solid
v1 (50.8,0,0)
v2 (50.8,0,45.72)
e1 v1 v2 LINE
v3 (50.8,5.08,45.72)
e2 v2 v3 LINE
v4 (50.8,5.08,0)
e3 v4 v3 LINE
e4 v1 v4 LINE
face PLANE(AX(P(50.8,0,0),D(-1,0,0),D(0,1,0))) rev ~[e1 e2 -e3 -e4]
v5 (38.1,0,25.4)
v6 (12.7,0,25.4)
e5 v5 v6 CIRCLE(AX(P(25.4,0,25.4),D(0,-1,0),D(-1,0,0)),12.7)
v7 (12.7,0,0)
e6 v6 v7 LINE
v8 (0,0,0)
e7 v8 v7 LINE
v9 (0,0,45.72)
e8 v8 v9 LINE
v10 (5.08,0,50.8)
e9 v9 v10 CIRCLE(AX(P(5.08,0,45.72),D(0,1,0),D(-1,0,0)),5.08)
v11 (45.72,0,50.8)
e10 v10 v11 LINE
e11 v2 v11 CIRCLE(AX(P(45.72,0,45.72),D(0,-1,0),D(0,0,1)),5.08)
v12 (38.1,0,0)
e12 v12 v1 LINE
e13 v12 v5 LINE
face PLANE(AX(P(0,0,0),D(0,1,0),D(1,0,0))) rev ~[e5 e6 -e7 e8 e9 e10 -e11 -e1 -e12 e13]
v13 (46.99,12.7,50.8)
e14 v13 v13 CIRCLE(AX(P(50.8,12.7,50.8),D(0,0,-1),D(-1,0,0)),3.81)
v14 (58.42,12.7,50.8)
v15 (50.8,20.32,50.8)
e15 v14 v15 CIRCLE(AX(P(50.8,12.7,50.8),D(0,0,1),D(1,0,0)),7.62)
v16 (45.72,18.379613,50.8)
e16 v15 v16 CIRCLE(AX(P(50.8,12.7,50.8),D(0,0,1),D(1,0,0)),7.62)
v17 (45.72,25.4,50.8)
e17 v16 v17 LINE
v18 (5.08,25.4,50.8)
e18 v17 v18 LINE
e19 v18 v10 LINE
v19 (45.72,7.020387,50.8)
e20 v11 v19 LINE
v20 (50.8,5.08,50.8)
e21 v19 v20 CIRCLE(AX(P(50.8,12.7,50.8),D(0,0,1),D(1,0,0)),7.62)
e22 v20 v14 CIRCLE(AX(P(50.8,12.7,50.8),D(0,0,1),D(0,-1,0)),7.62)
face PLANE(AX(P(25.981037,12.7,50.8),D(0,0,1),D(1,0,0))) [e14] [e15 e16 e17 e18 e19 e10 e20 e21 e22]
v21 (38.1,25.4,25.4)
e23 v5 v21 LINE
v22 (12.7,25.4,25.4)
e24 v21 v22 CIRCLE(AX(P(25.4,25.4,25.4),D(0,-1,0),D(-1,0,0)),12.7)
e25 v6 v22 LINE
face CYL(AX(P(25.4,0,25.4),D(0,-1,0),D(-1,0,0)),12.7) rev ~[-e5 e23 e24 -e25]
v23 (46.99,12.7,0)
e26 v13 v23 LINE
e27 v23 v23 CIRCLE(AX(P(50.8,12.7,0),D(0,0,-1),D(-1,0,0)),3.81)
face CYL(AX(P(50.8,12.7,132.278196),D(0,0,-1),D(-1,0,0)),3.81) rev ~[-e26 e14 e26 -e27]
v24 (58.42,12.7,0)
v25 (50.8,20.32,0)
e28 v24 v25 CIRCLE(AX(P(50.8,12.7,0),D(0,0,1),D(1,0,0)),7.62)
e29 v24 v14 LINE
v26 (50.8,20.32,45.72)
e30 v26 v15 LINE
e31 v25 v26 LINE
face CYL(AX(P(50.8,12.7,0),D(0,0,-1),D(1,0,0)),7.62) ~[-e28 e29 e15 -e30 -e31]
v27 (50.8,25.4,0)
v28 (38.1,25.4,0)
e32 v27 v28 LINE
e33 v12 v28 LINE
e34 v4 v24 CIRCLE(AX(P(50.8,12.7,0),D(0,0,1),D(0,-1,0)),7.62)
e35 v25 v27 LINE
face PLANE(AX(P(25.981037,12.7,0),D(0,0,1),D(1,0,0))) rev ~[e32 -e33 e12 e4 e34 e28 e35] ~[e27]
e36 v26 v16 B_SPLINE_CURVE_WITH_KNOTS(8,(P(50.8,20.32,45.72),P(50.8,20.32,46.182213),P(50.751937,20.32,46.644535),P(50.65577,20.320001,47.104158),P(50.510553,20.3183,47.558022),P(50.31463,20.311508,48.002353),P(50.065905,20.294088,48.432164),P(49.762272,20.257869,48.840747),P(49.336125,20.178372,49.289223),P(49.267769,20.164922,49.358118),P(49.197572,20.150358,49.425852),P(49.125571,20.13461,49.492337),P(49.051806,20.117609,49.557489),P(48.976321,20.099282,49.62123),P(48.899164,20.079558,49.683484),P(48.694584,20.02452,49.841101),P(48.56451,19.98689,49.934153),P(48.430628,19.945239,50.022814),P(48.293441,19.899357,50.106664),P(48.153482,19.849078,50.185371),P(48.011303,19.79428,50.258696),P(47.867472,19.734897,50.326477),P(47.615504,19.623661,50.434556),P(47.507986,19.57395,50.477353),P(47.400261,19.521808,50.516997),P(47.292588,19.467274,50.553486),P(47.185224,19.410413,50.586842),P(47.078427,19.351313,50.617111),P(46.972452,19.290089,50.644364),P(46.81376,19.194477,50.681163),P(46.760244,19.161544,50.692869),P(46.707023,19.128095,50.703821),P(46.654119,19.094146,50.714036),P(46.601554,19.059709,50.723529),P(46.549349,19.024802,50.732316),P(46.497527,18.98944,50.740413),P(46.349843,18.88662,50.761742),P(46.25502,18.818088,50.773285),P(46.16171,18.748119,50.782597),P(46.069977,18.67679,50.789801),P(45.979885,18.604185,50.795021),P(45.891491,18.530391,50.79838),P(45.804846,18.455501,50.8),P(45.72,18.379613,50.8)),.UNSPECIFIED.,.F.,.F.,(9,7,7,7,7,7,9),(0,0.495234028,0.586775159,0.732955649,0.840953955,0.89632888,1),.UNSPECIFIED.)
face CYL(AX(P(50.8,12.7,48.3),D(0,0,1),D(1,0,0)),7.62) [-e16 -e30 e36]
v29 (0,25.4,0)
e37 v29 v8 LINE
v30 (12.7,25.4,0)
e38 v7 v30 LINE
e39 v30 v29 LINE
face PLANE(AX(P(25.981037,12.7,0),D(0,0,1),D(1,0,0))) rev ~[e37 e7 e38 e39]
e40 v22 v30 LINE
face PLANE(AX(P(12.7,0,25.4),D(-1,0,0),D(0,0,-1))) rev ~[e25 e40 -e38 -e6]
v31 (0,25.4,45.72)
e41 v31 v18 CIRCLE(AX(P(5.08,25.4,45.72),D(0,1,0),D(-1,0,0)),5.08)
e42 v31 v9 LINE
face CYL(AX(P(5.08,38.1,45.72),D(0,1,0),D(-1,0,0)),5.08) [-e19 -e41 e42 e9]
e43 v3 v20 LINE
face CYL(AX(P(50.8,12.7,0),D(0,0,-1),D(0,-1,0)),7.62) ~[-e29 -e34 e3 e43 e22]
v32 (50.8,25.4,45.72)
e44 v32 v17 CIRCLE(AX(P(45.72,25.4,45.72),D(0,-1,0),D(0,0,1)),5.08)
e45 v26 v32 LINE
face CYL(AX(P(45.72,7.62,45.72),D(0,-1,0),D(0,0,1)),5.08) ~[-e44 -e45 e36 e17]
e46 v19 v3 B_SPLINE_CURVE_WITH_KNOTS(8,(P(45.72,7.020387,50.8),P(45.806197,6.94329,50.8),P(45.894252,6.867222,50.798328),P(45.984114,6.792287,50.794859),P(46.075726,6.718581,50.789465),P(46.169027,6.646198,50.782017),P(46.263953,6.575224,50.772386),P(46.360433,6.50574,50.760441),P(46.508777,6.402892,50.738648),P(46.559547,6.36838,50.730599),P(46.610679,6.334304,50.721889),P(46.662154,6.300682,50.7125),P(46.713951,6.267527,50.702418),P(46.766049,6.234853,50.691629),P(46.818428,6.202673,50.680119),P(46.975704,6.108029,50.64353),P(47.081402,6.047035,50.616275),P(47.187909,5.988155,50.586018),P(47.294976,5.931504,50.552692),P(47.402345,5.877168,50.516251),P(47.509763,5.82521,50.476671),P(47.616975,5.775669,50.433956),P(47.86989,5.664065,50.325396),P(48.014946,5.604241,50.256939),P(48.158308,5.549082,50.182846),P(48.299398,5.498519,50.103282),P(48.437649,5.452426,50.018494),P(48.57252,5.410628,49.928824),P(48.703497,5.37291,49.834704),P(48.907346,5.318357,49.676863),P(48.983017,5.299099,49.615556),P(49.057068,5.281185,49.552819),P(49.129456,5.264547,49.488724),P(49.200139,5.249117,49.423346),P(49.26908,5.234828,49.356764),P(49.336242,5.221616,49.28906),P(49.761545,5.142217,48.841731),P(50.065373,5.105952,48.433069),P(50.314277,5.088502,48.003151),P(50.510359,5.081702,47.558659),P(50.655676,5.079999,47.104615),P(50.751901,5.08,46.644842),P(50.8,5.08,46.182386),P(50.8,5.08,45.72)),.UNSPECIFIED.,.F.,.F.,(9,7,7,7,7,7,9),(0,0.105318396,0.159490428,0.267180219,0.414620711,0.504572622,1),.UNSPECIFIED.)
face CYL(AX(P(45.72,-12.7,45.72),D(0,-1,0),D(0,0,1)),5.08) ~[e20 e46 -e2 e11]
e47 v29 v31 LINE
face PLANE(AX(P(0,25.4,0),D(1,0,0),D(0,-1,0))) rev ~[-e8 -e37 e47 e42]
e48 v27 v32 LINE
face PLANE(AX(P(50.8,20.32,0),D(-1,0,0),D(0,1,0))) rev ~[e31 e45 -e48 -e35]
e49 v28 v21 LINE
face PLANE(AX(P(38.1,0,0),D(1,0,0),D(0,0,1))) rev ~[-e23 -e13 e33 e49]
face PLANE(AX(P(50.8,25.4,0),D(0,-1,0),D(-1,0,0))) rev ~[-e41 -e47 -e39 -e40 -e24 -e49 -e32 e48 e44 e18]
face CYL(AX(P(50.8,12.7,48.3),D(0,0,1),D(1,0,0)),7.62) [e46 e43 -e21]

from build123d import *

# Parameters (mm, degrees)
F1_DEPTH     = 50.8
F3_DEPTH     = 25.4
F4_T1_DEPTH  = 50.8
F4_T6_DEPTH  = 30.48
F4_S7_R      = 7.62
F4_T8_DEPTH  = 17
F4_T12_DEPTH = 30.48
F4_S13_R     = 7.62
F4_T14_DEPTH = 17
F6_D         = 7.62


# Not quite as in the source:
# - a fillet or chamfer that OpenCascade refuses, or shapes differently, is made with other operations: its cross-section is extruded or revolved along the edge and cut away or added


with BuildPart() as f1:
    # F0 (on Top) → F1 (new body)
    with BuildSketch(Plane.XY):
        with BuildLine():
            Line((0, 25.4), (0, 0))
            Line((0, 0), (50.8, 0))
            Line((50.8, 0), (50.8, 5.08))
            ThreePointArc((50.8, 5.08), (43.18, 12.7), (50.8, 20.32))
            Line((50.8, 20.32), (50.8, 25.4))
            Line((50.8, 25.4), (0, 25.4))
        make_face()
        with BuildLine():
            Line((50.8, 20.32), (50.8, 5.08))
            ThreePointArc((50.8, 5.08), (56.1881536726, 7.3118463274), (58.42, 12.7))
            ThreePointArc((58.42, 12.7), (56.1881536726, 18.0881536726), (50.8, 20.32))
        make_face()
        with BuildLine():
            ThreePointArc((50.8, 20.32), (43.18, 12.7), (50.8, 5.08))
            Line((50.8, 5.08), (50.8, 20.32))
        make_face()
    extrude(amount=F1_DEPTH)

    # F2 (on face) → F3 (cut)
    with BuildSketch(Plane.XZ):
        with BuildLine():
            ThreePointArc((38.1, 25.4), (25.4, 38.1), (12.7, 25.4))
            Line((12.7, 25.4), (38.1, 25.4))
        make_face()
        with BuildLine():
            Line((38.1, 25.4), (12.7, 25.4))
            ThreePointArc((12.7, 25.4), (25.4, 12.7), (38.1, 25.4))
        make_face()
        with BuildLine():
            Line((12.7, 25.4), (12.7, 0))
            Line((12.7, 0), (38.1, 0))
            Line((38.1, 0), (38.1, 25.4))
            ThreePointArc((38.1, 25.4), (25.4, 12.7), (12.7, 25.4))
        make_face()
    extrude(amount=-F3_DEPTH, mode=Mode.SUBTRACT)

    # F4: fillet of radius 5.08 on 3 edges, made by hand

    # F4_s2 → F4_t1 (cut)
    with BuildSketch(Plane.XZ.offset(-38.1)):
        with BuildLine():
            ThreePointArc((0, 45.72), (1.4878975516, 49.3121024484), (5.08, 50.8))
            Line((5.08, 50.8), (0, 50.8))
            Line((0, 50.8), (0, 45.72))
        make_face()
    extrude(amount=F4_T1_DEPTH, mode=Mode.SUBTRACT)


with BuildPart() as f4_tool4:
    # F4_s5 → F4_t6 (new body)
    with BuildSketch(Plane.XZ.offset(12.7)):
        with BuildLine():
            ThreePointArc((45.72, 50.8), (49.3121024484, 49.3121024484), (50.8, 45.72))
            Line((50.8, 45.72), (50.8, 50.8))
            Line((50.8, 50.8), (45.72, 50.8))
        make_face()
    extrude(amount=-F4_T6_DEPTH)

    # F4_s7 → F4_t8 (cut, symmetric)
    with BuildSketch(Plane.XY.offset(48.3)):
        with Locations((50.8, 12.7)):
            Circle(F4_S7_R)
    extrude(amount=F4_T8_DEPTH, both=True, mode=Mode.SUBTRACT)


with BuildPart() as f1_1:
    add(f1.part)

    # F4_t3: cut F4_tool4
    add(f4_tool4.part, mode=Mode.SUBTRACT)


with BuildPart() as f4_tool10:
    # F4_s11 → F4_t12 (new body)
    with BuildSketch(Plane.XZ.offset(-7.62)):
        with BuildLine():
            ThreePointArc((45.72, 50.8), (49.3121024484, 49.3121024484), (50.8, 45.72))
            Line((50.8, 45.72), (50.8, 50.8))
            Line((50.8, 50.8), (45.72, 50.8))
        make_face()
    extrude(amount=-F4_T12_DEPTH)

    # F4_s13 → F4_t14 (cut, symmetric)
    with BuildSketch(Plane.XY.offset(48.3)):
        with Locations((50.8, 12.7)):
            Circle(F4_S13_R)
    extrude(amount=F4_T14_DEPTH, both=True, mode=Mode.SUBTRACT)


with BuildPart() as f1_2:
    add(f1_1.part)

    # F4_t9: cut F4_tool10
    add(f4_tool10.part, mode=Mode.SUBTRACT)

    # F6 (through all)
    with Locations(Plane.XY.offset(50.8)):
        with Locations((50.8, 12.7)):
            Hole(F6_D / 2)


solid = f1_2.part
